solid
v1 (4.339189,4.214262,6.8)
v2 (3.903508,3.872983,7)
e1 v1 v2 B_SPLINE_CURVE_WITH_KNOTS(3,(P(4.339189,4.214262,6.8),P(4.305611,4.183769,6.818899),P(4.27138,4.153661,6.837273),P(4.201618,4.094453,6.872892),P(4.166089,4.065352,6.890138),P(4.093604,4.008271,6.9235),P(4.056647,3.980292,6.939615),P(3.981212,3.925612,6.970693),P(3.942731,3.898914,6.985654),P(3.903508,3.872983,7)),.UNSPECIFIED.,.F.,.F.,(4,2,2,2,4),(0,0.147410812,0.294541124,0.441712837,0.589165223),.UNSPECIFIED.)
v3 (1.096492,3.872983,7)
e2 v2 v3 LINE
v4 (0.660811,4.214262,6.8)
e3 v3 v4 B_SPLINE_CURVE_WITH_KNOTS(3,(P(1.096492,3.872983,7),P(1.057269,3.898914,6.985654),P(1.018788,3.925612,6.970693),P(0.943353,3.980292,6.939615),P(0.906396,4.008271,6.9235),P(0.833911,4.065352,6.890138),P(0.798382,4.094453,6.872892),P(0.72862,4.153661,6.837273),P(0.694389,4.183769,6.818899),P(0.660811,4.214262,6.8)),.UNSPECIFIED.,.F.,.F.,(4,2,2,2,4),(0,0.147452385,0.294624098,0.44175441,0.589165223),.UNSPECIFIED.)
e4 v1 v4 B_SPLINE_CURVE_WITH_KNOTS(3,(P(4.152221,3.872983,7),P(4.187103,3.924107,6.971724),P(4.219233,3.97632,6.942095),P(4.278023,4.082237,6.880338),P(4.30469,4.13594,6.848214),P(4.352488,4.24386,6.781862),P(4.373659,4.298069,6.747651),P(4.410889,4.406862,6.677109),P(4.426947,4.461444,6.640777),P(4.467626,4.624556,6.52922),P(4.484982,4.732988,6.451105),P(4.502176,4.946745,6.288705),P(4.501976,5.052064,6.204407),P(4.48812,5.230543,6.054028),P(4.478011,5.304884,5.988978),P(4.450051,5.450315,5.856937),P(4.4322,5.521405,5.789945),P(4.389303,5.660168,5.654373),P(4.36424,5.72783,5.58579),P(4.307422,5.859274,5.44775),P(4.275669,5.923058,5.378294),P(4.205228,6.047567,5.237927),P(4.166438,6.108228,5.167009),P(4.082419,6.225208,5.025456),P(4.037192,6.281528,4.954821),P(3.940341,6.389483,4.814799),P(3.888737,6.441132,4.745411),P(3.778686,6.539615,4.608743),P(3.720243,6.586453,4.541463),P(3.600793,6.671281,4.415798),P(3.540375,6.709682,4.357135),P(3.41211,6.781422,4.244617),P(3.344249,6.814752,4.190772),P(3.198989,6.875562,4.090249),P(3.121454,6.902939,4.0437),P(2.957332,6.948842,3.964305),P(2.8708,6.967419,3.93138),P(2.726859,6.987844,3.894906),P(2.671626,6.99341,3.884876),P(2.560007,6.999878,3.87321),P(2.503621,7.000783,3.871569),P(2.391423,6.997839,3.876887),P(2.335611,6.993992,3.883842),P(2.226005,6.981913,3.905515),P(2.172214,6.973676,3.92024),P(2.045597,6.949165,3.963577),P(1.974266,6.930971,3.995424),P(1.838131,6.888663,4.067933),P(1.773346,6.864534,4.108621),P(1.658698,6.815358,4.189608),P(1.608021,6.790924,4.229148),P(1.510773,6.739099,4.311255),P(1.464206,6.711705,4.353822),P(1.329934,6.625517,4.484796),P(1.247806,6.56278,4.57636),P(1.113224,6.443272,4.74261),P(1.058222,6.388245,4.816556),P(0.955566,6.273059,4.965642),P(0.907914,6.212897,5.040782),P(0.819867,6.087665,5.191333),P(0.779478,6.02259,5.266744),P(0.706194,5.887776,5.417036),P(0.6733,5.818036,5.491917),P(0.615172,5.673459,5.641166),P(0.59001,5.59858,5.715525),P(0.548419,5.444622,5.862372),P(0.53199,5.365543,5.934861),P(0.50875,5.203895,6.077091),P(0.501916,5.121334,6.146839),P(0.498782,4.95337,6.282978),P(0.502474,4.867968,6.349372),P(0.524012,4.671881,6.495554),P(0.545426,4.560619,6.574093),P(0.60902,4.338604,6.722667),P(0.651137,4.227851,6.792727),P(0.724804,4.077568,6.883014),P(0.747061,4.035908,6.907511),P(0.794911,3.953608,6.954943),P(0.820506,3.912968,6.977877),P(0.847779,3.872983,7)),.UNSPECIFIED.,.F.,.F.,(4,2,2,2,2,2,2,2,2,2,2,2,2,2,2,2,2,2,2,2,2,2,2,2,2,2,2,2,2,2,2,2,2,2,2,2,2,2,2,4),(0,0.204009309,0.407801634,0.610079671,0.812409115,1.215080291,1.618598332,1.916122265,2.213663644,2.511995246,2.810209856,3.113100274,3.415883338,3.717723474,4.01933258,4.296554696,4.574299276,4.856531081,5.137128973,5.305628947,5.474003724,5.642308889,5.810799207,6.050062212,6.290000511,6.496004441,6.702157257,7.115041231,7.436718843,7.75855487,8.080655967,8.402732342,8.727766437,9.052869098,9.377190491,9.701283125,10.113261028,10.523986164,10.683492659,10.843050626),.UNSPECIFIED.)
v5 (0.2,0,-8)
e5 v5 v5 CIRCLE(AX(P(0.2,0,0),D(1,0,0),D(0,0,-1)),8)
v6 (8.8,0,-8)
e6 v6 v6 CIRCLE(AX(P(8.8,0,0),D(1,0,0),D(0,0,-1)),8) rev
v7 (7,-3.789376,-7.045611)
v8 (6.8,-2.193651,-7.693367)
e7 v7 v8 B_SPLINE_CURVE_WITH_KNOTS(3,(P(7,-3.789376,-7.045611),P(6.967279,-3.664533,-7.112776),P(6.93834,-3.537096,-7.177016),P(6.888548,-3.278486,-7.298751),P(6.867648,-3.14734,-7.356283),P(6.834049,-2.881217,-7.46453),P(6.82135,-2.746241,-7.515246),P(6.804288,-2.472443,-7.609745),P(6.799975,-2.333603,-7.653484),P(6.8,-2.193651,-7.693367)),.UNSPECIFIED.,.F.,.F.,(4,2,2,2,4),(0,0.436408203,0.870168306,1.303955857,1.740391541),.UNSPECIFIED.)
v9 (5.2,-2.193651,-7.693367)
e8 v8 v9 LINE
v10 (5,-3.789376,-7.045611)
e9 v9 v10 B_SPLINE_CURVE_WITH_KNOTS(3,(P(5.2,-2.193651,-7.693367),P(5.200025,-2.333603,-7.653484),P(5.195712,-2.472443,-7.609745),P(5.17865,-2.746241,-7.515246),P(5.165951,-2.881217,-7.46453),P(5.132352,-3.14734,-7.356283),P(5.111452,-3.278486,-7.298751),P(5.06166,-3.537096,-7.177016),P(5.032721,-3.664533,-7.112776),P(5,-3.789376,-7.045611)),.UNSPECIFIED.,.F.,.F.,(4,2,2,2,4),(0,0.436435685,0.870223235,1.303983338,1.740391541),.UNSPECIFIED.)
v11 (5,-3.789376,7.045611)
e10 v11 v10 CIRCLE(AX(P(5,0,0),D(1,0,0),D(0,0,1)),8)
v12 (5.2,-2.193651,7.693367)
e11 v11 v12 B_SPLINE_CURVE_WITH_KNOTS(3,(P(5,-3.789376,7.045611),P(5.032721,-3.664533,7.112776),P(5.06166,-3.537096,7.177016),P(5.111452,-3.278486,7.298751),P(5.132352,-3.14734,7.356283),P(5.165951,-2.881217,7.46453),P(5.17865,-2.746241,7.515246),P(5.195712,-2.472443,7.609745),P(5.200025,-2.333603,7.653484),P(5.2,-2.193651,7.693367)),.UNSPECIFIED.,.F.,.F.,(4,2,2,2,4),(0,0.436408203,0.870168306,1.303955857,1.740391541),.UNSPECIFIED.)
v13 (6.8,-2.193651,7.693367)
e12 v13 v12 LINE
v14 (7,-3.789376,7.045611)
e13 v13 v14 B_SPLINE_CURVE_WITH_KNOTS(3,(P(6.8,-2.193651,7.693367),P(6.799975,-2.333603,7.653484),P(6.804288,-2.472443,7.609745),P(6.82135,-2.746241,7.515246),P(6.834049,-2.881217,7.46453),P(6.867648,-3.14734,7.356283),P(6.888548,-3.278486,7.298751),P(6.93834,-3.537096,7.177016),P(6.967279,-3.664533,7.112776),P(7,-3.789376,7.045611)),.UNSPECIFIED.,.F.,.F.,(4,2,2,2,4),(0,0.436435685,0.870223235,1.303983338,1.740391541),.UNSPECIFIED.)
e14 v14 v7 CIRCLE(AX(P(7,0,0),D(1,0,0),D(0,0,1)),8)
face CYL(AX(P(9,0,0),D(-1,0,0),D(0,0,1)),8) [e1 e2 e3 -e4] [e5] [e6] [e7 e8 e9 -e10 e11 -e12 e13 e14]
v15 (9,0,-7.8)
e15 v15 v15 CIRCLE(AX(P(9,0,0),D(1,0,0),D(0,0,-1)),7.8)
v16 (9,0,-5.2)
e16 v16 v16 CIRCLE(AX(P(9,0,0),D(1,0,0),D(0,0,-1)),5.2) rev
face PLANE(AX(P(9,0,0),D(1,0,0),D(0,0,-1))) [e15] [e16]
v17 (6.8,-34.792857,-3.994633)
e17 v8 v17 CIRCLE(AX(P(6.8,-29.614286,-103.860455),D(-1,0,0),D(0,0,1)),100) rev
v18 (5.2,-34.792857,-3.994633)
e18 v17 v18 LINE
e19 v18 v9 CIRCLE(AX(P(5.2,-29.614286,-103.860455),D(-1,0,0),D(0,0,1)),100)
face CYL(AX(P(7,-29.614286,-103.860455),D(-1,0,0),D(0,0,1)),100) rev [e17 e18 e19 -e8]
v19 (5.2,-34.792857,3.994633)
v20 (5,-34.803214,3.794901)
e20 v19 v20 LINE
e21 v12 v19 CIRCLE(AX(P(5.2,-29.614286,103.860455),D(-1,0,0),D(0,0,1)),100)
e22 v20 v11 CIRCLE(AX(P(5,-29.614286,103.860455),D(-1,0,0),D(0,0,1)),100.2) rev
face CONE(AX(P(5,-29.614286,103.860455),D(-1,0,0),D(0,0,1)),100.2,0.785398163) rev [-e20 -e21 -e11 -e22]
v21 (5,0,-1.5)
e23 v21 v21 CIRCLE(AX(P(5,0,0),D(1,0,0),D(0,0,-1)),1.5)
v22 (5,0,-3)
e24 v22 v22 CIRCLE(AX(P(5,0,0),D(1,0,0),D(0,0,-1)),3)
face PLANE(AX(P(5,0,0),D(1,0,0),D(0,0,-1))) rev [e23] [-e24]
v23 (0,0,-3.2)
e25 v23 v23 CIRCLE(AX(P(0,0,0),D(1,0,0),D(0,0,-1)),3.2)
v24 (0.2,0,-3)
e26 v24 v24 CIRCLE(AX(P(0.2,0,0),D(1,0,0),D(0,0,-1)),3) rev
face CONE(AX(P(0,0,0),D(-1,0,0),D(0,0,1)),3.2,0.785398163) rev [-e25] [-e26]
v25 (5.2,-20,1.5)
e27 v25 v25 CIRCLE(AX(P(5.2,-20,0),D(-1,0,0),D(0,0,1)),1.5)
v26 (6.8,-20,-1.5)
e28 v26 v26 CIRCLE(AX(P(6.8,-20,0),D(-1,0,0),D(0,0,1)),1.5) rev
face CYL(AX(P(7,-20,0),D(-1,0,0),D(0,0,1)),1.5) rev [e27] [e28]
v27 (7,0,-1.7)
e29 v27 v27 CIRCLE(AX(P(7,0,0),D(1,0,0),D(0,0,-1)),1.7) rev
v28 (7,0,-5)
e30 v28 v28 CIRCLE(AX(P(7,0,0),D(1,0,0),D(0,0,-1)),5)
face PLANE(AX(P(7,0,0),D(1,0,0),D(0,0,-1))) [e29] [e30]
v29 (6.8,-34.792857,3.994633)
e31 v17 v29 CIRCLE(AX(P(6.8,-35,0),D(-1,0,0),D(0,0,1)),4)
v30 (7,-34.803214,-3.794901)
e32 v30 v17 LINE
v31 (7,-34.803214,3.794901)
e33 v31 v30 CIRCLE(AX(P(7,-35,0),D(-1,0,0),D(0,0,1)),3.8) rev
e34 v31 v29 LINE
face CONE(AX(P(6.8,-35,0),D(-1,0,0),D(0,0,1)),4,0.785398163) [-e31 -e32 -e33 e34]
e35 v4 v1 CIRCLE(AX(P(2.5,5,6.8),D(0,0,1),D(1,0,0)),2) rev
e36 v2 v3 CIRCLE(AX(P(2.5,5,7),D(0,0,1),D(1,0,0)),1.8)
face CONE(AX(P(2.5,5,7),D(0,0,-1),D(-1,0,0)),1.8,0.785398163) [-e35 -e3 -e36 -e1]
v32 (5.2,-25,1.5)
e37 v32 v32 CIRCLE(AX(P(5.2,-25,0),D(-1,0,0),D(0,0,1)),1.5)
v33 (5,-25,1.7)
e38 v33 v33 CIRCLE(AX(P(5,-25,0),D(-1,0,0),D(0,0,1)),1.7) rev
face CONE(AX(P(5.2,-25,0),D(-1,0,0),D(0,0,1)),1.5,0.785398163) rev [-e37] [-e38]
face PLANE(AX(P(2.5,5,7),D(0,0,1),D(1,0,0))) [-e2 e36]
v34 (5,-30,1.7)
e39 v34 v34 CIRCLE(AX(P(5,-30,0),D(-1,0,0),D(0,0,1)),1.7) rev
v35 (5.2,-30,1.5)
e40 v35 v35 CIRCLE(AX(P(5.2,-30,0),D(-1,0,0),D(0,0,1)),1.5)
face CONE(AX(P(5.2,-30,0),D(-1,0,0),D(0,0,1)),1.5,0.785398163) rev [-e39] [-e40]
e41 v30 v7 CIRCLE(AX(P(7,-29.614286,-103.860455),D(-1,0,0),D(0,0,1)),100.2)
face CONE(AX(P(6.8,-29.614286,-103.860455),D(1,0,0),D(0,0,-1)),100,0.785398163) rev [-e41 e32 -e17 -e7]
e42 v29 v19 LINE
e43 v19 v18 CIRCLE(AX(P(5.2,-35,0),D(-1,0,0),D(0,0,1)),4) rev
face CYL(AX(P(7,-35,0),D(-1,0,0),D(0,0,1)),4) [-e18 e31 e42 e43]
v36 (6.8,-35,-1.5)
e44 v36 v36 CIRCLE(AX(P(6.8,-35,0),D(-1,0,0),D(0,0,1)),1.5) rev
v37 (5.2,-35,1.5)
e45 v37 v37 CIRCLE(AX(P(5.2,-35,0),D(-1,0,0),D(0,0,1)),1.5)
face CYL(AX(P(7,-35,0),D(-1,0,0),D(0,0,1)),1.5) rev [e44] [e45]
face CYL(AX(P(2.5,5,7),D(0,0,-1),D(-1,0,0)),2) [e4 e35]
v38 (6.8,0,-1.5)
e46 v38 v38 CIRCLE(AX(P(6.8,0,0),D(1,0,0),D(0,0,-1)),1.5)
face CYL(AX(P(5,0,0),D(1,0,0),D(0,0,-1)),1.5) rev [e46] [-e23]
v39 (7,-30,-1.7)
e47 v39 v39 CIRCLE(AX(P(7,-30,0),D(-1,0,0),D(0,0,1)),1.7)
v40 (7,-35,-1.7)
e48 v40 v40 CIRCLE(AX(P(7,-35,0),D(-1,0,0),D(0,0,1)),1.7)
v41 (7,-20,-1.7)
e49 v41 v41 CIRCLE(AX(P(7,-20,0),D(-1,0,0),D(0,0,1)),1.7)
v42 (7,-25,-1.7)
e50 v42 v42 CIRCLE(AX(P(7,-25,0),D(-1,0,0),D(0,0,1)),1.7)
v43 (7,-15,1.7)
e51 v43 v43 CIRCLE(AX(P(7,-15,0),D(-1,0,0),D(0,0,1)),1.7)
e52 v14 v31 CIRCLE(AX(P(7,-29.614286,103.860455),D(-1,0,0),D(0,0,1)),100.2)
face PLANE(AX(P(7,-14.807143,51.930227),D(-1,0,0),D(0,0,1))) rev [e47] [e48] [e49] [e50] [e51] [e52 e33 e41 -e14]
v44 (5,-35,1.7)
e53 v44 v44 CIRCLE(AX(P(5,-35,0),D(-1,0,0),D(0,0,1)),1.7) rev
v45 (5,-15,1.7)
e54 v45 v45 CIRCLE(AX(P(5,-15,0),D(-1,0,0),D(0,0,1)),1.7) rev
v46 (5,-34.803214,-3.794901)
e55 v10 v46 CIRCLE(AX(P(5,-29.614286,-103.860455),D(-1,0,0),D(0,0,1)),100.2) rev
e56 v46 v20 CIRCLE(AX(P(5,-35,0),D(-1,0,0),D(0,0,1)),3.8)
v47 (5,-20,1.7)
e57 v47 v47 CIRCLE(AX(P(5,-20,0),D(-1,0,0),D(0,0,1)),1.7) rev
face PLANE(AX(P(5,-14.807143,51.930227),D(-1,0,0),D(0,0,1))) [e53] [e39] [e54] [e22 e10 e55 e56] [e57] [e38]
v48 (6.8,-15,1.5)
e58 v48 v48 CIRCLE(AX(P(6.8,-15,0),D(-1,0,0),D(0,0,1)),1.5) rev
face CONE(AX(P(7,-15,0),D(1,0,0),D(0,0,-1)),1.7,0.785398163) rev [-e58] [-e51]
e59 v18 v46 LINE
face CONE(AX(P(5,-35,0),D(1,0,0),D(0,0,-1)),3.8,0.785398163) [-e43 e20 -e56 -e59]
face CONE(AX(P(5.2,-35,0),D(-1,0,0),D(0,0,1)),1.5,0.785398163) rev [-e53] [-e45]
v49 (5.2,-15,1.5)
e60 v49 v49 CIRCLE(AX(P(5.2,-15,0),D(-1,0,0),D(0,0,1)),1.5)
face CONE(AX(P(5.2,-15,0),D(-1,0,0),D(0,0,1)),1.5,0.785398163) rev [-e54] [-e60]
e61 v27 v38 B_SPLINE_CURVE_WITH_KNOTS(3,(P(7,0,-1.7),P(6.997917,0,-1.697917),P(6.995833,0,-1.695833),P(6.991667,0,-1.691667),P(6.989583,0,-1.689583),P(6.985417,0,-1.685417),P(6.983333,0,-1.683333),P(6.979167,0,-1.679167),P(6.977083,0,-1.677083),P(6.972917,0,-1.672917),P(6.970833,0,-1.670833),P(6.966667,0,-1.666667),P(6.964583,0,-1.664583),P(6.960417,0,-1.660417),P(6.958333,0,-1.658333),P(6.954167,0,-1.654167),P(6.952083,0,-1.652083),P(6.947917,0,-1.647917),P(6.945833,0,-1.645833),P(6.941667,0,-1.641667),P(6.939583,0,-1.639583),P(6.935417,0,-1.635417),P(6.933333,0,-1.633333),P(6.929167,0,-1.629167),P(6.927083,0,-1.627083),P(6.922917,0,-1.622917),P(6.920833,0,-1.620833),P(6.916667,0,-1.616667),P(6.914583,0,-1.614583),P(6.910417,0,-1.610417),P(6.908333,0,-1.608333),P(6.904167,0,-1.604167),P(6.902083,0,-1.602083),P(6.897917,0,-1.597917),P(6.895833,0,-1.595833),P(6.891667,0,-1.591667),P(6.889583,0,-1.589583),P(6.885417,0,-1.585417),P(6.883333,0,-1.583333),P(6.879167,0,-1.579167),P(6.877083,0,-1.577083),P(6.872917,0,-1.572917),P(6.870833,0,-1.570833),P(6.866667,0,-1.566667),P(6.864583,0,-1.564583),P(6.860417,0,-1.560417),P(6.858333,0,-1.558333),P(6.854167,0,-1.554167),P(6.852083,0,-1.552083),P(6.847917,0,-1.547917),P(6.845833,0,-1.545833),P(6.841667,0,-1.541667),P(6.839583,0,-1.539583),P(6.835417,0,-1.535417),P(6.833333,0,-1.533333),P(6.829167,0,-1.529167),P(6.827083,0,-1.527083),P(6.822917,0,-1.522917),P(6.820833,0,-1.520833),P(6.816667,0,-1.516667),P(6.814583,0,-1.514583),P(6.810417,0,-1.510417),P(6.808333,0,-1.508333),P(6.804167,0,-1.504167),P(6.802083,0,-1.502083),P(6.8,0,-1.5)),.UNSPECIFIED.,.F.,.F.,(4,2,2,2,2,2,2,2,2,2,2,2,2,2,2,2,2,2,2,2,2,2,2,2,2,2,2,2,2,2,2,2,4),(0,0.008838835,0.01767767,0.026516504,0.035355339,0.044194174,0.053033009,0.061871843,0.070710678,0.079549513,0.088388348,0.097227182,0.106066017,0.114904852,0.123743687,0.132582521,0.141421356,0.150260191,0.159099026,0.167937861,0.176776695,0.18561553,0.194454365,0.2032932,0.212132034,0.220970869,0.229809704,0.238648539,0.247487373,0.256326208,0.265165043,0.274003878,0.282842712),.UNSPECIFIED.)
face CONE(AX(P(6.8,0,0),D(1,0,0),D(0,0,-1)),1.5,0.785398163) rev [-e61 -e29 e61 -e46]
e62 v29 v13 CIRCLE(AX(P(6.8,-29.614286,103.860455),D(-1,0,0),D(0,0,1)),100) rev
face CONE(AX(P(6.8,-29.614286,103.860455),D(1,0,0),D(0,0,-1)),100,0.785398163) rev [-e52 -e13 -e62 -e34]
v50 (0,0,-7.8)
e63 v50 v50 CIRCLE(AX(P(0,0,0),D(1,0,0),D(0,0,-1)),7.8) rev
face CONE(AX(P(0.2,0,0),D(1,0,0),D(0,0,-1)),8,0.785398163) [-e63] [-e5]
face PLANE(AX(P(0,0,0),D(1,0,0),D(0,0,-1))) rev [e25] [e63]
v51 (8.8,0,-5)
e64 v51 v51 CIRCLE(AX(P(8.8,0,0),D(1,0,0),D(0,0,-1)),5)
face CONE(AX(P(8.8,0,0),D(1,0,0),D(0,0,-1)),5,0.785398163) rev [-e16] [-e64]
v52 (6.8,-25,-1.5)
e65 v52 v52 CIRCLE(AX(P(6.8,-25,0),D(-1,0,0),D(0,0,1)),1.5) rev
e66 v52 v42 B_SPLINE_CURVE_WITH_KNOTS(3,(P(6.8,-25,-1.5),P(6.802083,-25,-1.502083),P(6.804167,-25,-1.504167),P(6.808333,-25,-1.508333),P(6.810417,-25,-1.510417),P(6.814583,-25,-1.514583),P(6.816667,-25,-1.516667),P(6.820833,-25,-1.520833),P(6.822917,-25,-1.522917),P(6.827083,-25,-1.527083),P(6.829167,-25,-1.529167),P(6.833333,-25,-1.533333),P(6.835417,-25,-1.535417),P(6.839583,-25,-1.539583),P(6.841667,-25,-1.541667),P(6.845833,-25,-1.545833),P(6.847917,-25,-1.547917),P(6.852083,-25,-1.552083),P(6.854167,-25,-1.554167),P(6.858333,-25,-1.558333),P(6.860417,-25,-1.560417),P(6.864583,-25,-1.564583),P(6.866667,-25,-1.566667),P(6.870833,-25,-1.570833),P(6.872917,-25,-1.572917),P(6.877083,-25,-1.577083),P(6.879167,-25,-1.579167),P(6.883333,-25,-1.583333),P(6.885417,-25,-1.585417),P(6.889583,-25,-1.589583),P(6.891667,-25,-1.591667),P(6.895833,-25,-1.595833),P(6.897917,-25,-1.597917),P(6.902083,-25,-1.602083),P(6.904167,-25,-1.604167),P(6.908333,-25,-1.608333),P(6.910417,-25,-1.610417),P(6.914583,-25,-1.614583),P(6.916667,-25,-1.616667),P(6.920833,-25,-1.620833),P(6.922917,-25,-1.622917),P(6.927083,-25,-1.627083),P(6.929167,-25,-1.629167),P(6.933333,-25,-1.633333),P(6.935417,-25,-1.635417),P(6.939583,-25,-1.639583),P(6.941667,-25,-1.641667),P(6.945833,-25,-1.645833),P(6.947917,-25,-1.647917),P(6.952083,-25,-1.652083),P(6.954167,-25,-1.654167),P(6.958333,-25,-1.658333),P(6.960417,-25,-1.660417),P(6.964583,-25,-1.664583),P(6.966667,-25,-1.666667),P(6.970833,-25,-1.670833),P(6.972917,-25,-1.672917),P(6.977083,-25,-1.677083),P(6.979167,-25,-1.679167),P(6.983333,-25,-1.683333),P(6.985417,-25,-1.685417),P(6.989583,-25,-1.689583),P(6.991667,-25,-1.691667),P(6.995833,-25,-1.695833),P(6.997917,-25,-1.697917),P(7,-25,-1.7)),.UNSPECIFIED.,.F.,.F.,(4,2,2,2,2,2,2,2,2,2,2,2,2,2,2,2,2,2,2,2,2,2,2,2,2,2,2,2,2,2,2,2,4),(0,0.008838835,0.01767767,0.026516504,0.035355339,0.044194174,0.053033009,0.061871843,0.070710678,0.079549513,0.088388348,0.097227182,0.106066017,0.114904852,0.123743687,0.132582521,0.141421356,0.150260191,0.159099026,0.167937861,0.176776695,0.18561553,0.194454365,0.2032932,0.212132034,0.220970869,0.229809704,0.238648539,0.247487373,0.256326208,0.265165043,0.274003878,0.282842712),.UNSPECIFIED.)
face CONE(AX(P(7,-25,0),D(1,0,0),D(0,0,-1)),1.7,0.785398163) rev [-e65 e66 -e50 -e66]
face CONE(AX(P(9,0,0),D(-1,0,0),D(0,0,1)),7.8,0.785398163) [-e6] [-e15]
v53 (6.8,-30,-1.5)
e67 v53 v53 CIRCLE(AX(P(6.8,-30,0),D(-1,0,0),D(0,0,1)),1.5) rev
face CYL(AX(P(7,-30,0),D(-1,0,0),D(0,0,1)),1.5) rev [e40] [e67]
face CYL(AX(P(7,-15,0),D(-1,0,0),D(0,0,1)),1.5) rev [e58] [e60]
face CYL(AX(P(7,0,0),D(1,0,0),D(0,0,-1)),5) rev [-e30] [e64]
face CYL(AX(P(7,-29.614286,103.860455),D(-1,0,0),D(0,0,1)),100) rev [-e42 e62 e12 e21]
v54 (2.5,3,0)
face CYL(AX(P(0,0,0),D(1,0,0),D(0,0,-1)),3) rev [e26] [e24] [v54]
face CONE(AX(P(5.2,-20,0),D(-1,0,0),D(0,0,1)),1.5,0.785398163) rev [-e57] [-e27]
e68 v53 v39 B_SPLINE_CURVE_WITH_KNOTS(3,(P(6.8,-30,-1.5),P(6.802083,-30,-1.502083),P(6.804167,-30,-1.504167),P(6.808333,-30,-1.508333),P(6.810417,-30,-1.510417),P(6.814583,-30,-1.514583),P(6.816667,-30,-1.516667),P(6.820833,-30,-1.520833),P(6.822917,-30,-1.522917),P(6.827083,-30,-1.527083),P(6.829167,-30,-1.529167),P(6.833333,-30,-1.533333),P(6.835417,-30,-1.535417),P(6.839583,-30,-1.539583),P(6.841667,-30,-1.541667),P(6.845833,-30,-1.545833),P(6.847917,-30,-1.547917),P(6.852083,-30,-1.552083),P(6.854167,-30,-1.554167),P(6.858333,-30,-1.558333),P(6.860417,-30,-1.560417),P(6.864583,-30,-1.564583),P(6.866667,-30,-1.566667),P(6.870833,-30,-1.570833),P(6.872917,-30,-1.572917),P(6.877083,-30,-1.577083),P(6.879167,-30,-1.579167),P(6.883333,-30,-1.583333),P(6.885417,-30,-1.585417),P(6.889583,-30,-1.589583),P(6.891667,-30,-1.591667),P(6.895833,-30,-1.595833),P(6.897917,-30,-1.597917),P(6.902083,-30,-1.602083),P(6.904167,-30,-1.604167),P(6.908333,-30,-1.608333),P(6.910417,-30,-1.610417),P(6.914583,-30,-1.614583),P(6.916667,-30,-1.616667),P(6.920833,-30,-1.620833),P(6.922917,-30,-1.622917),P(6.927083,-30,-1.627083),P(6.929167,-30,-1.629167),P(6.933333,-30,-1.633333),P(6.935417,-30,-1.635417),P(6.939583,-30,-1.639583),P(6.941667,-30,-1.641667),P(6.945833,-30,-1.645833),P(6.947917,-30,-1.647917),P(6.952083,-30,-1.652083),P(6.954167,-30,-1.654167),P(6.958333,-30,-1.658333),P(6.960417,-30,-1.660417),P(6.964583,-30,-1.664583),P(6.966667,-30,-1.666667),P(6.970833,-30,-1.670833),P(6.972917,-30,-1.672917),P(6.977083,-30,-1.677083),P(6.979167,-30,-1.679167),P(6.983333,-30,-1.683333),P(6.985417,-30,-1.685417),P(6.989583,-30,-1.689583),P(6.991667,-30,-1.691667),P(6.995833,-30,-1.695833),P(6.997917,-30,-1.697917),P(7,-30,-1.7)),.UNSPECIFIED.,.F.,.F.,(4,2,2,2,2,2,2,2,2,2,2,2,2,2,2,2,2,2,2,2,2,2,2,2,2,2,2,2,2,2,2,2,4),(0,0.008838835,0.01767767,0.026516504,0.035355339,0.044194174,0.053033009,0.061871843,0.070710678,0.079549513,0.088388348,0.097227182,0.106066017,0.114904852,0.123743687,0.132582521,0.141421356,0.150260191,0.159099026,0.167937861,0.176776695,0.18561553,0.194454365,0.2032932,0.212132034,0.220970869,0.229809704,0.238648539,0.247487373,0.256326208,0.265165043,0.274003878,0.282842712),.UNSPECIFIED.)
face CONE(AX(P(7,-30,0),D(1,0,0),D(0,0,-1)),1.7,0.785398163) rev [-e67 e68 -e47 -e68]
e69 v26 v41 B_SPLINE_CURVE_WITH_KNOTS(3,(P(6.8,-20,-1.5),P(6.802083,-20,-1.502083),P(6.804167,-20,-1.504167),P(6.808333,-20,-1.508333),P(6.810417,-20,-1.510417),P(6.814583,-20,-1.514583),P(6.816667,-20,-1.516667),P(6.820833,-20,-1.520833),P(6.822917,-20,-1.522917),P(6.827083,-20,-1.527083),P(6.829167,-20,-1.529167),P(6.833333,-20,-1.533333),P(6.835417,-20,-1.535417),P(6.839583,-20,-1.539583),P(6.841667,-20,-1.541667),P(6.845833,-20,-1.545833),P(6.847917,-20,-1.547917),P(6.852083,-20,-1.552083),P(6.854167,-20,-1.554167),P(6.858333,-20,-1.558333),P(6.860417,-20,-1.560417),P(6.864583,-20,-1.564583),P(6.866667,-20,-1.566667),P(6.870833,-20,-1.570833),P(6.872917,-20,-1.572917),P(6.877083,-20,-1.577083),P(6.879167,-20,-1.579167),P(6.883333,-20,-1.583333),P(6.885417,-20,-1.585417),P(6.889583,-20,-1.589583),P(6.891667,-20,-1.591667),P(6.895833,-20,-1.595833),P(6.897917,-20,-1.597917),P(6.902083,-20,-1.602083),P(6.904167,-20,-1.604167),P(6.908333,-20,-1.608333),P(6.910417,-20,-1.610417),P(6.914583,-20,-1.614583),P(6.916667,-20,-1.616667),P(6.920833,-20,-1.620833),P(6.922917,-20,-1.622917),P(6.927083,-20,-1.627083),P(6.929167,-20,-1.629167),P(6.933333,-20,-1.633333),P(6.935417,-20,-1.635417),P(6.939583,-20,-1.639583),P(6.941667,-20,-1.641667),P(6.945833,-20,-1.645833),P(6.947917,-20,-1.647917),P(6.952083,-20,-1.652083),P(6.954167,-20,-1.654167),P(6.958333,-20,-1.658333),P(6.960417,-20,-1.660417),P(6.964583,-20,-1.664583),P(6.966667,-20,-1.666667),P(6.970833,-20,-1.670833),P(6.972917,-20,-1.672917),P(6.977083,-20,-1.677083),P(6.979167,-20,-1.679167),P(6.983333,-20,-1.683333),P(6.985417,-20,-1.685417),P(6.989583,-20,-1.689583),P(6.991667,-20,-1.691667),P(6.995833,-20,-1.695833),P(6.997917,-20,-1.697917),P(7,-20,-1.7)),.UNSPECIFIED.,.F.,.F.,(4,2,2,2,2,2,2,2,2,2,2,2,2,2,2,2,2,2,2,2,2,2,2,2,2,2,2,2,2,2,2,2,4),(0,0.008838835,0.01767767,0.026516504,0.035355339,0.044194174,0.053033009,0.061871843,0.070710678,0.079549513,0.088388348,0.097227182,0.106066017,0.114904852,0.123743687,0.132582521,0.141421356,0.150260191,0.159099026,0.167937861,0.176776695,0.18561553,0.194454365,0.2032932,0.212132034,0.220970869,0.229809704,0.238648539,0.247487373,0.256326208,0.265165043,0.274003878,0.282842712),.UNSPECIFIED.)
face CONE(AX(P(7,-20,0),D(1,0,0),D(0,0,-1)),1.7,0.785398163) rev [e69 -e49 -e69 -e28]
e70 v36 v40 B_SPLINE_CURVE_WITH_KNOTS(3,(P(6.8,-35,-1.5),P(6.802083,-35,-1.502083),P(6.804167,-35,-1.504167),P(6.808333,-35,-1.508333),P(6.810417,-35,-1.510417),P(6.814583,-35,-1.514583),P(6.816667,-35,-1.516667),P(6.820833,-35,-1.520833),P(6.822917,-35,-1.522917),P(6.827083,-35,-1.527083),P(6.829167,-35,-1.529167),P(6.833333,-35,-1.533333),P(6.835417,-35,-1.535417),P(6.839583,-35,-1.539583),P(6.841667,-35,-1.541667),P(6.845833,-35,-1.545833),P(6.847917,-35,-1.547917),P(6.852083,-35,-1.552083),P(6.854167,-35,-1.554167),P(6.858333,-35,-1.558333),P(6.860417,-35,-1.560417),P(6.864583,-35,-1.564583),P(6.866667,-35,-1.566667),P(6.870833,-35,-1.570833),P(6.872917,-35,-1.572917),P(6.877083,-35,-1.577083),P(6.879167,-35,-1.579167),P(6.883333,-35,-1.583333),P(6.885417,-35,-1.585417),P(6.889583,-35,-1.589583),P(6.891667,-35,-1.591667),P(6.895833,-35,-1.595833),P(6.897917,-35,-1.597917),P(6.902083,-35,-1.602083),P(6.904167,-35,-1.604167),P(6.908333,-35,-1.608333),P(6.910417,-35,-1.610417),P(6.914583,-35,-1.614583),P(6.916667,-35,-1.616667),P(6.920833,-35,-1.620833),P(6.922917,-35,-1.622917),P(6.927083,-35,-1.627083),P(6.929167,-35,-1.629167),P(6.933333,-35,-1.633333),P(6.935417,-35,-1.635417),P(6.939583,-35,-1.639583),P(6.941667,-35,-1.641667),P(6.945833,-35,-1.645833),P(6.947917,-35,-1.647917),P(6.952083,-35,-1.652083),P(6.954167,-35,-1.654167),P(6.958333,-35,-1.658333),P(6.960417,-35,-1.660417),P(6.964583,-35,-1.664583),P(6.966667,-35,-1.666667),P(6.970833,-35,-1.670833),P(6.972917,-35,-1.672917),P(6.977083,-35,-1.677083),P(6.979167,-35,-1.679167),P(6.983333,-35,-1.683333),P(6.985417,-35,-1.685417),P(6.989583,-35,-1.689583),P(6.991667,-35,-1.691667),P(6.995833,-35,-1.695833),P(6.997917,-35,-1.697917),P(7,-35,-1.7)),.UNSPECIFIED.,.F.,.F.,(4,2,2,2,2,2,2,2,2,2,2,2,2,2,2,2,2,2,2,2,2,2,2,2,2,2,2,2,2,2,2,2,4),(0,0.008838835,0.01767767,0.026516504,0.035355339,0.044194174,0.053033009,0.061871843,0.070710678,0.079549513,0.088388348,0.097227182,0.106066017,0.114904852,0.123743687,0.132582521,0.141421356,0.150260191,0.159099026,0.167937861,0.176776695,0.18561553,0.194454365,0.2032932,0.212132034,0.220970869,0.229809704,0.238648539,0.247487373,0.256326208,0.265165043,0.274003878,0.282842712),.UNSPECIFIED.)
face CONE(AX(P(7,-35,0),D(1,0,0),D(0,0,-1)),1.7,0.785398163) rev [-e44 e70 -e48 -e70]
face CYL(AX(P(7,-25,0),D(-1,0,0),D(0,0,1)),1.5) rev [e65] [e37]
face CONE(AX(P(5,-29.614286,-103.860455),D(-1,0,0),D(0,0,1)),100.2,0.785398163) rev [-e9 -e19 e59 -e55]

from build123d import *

# Parameters (mm, degrees)
SKETCH_1_R          = 8
EXTRUDE_1_DEPTH     = 9
SKETCH_2_R          = 5
CUT_EXTRUDE_1_DEPTH = 2
SKETCH_3_R          = 1.5
CUT_EXTRUDE_2_DEPTH = 2
SKETCH_4_R          = 3
CUT_EXTRUDE_3_DEPTH = 5
SKETCH_6_R          = 2
EXTRUDE_2_DEPTH     = 7
SKETCH_7_R          = 1.5
EXTRUDE_3_DEPTH     = 2
CHAMFER_1_SIZE      = 0.2
CHAMFER_2_SIZE      = 0.2


with BuildPart() as part:
    # 草图1 → 凸台-拉伸1 (new body)
    with BuildSketch(Plane(origin=(0, 0, 0), x_dir=(0, 0, -1), z_dir=(1, 0, 0))):
        Circle(SKETCH_1_R)
    extrude(amount=EXTRUDE_1_DEPTH)

    # 草图2 → 切除-拉伸1 (cut)
    with BuildSketch(Plane(origin=(9, 0, 0), x_dir=(0, 0, -1), z_dir=(1, 0, 0))):
        Circle(SKETCH_2_R)
    extrude(amount=-CUT_EXTRUDE_1_DEPTH, mode=Mode.SUBTRACT)

    # 草图3 → 切除-拉伸2 (cut)
    with BuildSketch(Plane(origin=(7, 0, 0), x_dir=(0, 0, -1), z_dir=(1, 0, 0))):
        Circle(SKETCH_3_R)
    extrude(amount=-CUT_EXTRUDE_2_DEPTH, mode=Mode.SUBTRACT)

    # 草图4 → 切除-拉伸3 (cut)
    with BuildSketch(Plane(origin=(5, 0, 0), x_dir=(0, 0, -1), z_dir=(1, 0, 0))):
        Circle(SKETCH_4_R)
    extrude(amount=-CUT_EXTRUDE_3_DEPTH, mode=Mode.SUBTRACT)

    # 草图6 → 凸台-拉伸2 (add)
    with BuildSketch(Plane.XY):
        with Locations((2.5, 5)):
            Circle(SKETCH_6_R)
    extrude(amount=EXTRUDE_2_DEPTH)

    # 草图7 → 凸台-拉伸3 (add)
    with BuildSketch(Plane.ZY.offset(-5)):
        with BuildLine():
            ThreePointArc((-3.994632879, -34.792857143), (0, -39), (3.994632879, -34.792857143))
            ThreePointArc((3.994632879, -34.792857143), (4.497974535, -18.34053276), (7.693367026, -2.193650794))
            ThreePointArc((7.693367026, -2.193650794), (0, -8), (-7.693367026, -2.193650794))
            ThreePointArc((-7.693367026, -2.193650794), (-4.497974535, -18.34053276), (-3.994632879, -34.792857143))
        make_face()
        with Locations((0, -35)):
            Circle(SKETCH_7_R, mode=Mode.SUBTRACT)
        with Locations((0, -30)):
            Circle(SKETCH_7_R, mode=Mode.SUBTRACT)
        with Locations((0, -25)):
            Circle(SKETCH_7_R, mode=Mode.SUBTRACT)
        with Locations((0, -20)):
            Circle(SKETCH_7_R, mode=Mode.SUBTRACT)
        with Locations((0, -15)):
            Circle(SKETCH_7_R, mode=Mode.SUBTRACT)
    extrude(amount=-EXTRUDE_3_DEPTH)

    # 倒角1
    # the kernel refuses this chamfer: 0.2 mm, written as the material it takes off along each edge
    with BuildSketch(Plane(origin=(2.5, 5, 7), x_dir=(0.6550221051171238, -0.7556097152683597, 0), z_dir=(-0.7556097152683597, -0.6550221051171238, 0))) as chamfer_1_piece_1_section:
        Polygon((2 - CHAMFER_1_SIZE, 0), (2, -CHAMFER_1_SIZE), (2, 0), align=None)
    chamfer_1_piece_1 = revolve(axis=Axis((2.5, 5, 7), (0, 0, 1)), revolution_arc=278.157347794, mode=Mode.PRIVATE)
    chamfer_1_piece_1 = chamfer_1_piece_1 - Plane(origin=(2.5, 0, 0), x_dir=(0, 0, -1), z_dir=(-1, 0, 0)) * Cylinder(8, 9, mode=Mode.PRIVATE)
    add(chamfer_1_piece_1, mode=Mode.SUBTRACT)
    with BuildSketch(Plane(origin=(0, 0, 0), x_dir=(0, 0, -1), z_dir=(0, -1, 0))) as chamfer_1_piece_2:
        Polygon((3 + CHAMFER_1_SIZE, 0), (3, CHAMFER_1_SIZE), (3, 0), align=None)
    revolve(axis=Axis((0, 0, 0), (1, 0, 0)), mode=Mode.SUBTRACT)
    with BuildSketch(Plane(origin=(0, 0, 0), x_dir=(0, 0, -1), z_dir=(0, -1, 0))) as chamfer_1_piece_3:
        Polygon((8, CHAMFER_1_SIZE), (8 - CHAMFER_1_SIZE, 0), (8, 0), align=None)
    revolve(axis=Axis((0, 0, 0), (1, 0, 0)), mode=Mode.SUBTRACT)
    with BuildSketch(Plane(origin=(7, 0, 0), x_dir=(0, 0, -1), z_dir=(0, -1, 0))) as chamfer_1_piece_4:
        Polygon((1.5 + CHAMFER_1_SIZE, 0), (1.5, -CHAMFER_1_SIZE), (1.5, 0), align=None)
    revolve(axis=Axis((7, 0, 0), (1, 0, 0)), mode=Mode.SUBTRACT)
    with BuildSketch(Plane(origin=(9, 0, 0), x_dir=(0, 0, -1), z_dir=(0, -1, 0))) as chamfer_1_piece_5:
        Polygon((5 + CHAMFER_1_SIZE, 0), (5, -CHAMFER_1_SIZE), (5, 0), align=None)
    revolve(axis=Axis((9, 0, 0), (1, 0, 0)), mode=Mode.SUBTRACT)
    with BuildSketch(Plane(origin=(9, 0, 0), x_dir=(0, 0, -1), z_dir=(0, -1, 0))) as chamfer_1_piece_6:
        Polygon((8, -CHAMFER_1_SIZE), (8 - CHAMFER_1_SIZE, 0), (8, 0), align=None)
    revolve(axis=Axis((9, 0, 0), (1, 0, 0)), mode=Mode.SUBTRACT)

    # 倒角2
    # the kernel refuses this chamfer: 0.2 mm, written as the material it takes off along each edge
    with BuildSketch(Plane(origin=(7, -29.614285714, 103.86045485), x_dir=(0, -0.05178571428571552, -0.9986582197107868), z_dir=(0, -0.9986582197107868, 0.05178571428571552))) as chamfer_2_piece_1_section:
        Polygon((100, -CHAMFER_2_SIZE), (100 + CHAMFER_2_SIZE, 0), (100, 0), align=None)
    chamfer_2_piece_1 = revolve(axis=Axis((7, -29.614285714, 103.86045485), (1, 0, 0)), revolution_arc=20.356645861, mode=Mode.PRIVATE)
    chamfer_2_piece_1 = chamfer_2_piece_1 - Plane(origin=(7, 0, 0), x_dir=(0, 0, -1), z_dir=(-1, 0, 0)) * Cylinder(8, 401, mode=Mode.PRIVATE)
    add(chamfer_2_piece_1, mode=Mode.SUBTRACT)
    with BuildSketch(Plane(origin=(7, -35, 0), x_dir=(0, 0.05178571428571369, -0.9986582197107869), z_dir=(0, 0.9986582197107869, 0.05178571428571369))) as chamfer_2_piece_2:
        Polygon((4 - CHAMFER_2_SIZE, 0), (4, CHAMFER_2_SIZE), (4, 0), align=None)
    revolve(axis=Axis((7, -35, 0), (-1, 0, 0)), revolution_arc=185.936861294, mode=Mode.SUBTRACT)
    with BuildSketch(Plane(origin=(7, -29.614285714, -103.86045485), x_dir=(0, 0.29884451461423694, 0.9543018160335759), z_dir=(0, 0.9543018160335759, -0.29884451461423694))) as chamfer_2_piece_3_section:
        Polygon((100 + CHAMFER_2_SIZE, 0), (100, -CHAMFER_2_SIZE), (100, 0), align=None)
    chamfer_2_piece_3 = revolve(axis=Axis((7, -29.614285714, -103.86045485), (1, 0, 0)), revolution_arc=20.356645861, mode=Mode.PRIVATE)
    chamfer_2_piece_3 = chamfer_2_piece_3 - Plane(origin=(7, 0, 0), x_dir=(0, 0, -1), z_dir=(-1, 0, 0)) * Cylinder(8, 401, mode=Mode.PRIVATE)
    add(chamfer_2_piece_3, mode=Mode.SUBTRACT)
    with BuildSketch(Plane(origin=(7, -15, 0), x_dir=(0, 0, 1), z_dir=(0, -1, 0))) as chamfer_2_piece_4:
        Polygon((1.5 + CHAMFER_2_SIZE, 0), (1.5, CHAMFER_2_SIZE), (1.5, 0), align=None)
    revolve(axis=Axis((7, -15, 0), (-1, 0, 0)), mode=Mode.SUBTRACT)
    with BuildSketch(Plane(origin=(7, -20, 0), x_dir=(0, 0, 1), z_dir=(0, -1, 0))) as chamfer_2_piece_5:
        Polygon((1.5 + CHAMFER_2_SIZE, 0), (1.5, CHAMFER_2_SIZE), (1.5, 0), align=None)
    revolve(axis=Axis((7, -20, 0), (-1, 0, 0)), mode=Mode.SUBTRACT)
    with BuildSketch(Plane(origin=(7, -25, 0), x_dir=(0, 0, 1), z_dir=(0, -1, 0))) as chamfer_2_piece_6:
        Polygon((1.5 + CHAMFER_2_SIZE, 0), (1.5, CHAMFER_2_SIZE), (1.5, 0), align=None)
    revolve(axis=Axis((7, -25, 0), (-1, 0, 0)), mode=Mode.SUBTRACT)
    with BuildSketch(Plane(origin=(7, -30, 0), x_dir=(0, 0, 1), z_dir=(0, -1, 0))) as chamfer_2_piece_7:
        Polygon((1.5 + CHAMFER_2_SIZE, 0), (1.5, CHAMFER_2_SIZE), (1.5, 0), align=None)
    revolve(axis=Axis((7, -30, 0), (-1, 0, 0)), mode=Mode.SUBTRACT)
    with BuildSketch(Plane(origin=(7, -35, 0), x_dir=(0, 0, 1), z_dir=(0, -1, 0))) as chamfer_2_piece_8:
        Polygon((1.5 + CHAMFER_2_SIZE, 0), (1.5, CHAMFER_2_SIZE), (1.5, 0), align=None)
    revolve(axis=Axis((7, -35, 0), (-1, 0, 0)), mode=Mode.SUBTRACT)
    with BuildSketch(Plane(origin=(5, -29.614285714, -103.86045485), x_dir=(0, 0.29884451461423694, 0.9543018160335759), z_dir=(0, 0.9543018160335759, -0.29884451461423694))) as chamfer_2_piece_9_section:
        Polygon((100 + CHAMFER_2_SIZE, 0), (100, CHAMFER_2_SIZE), (100, 0), align=None)
    chamfer_2_piece_9 = revolve(axis=Axis((5, -29.614285714, -103.86045485), (1, 0, 0)), revolution_arc=20.356645861, mode=Mode.PRIVATE)
    chamfer_2_piece_9 = chamfer_2_piece_9 - Plane(origin=(5, 0, 0), x_dir=(0, 0, -1), z_dir=(-1, 0, 0)) * Cylinder(8, 401, mode=Mode.PRIVATE)
    add(chamfer_2_piece_9, mode=Mode.SUBTRACT)
    with BuildSketch(Plane(origin=(5, -35, 0), x_dir=(0, 0.05178571428571369, -0.9986582197107869), z_dir=(0, 0.9986582197107869, 0.05178571428571369))) as chamfer_2_piece_10:
        Polygon((4 - CHAMFER_2_SIZE, 0), (4, -CHAMFER_2_SIZE), (4, 0), align=None)
    revolve(axis=Axis((5, -35, 0), (-1, 0, 0)), revolution_arc=185.936861294, mode=Mode.SUBTRACT)
    with BuildSketch(Plane(origin=(5, -29.614285714, 103.86045485), x_dir=(0, -0.05178571428571552, -0.9986582197107868), z_dir=(0, -0.9986582197107868, 0.05178571428571552))) as chamfer_2_piece_11_section:
        Polygon((100, CHAMFER_2_SIZE), (100 + CHAMFER_2_SIZE, 0), (100, 0), align=None)
    chamfer_2_piece_11 = revolve(axis=Axis((5, -29.614285714, 103.86045485), (1, 0, 0)), revolution_arc=20.356645861, mode=Mode.PRIVATE)
    chamfer_2_piece_11 = chamfer_2_piece_11 - Plane(origin=(5, 0, 0), x_dir=(0, 0, -1), z_dir=(-1, 0, 0)) * Cylinder(8, 401, mode=Mode.PRIVATE)
    add(chamfer_2_piece_11, mode=Mode.SUBTRACT)
    with BuildSketch(Plane(origin=(5, -35, 0), x_dir=(0, 0, 1), z_dir=(0, -1, 0))) as chamfer_2_piece_12:
        Polygon((1.5 + CHAMFER_2_SIZE, 0), (1.5, -CHAMFER_2_SIZE), (1.5, 0), align=None)
    revolve(axis=Axis((5, -35, 0), (-1, 0, 0)), mode=Mode.SUBTRACT)
    with BuildSketch(Plane(origin=(5, -30, 0), x_dir=(0, 0, 1), z_dir=(0, -1, 0))) as chamfer_2_piece_13:
        Polygon((1.5 + CHAMFER_2_SIZE, 0), (1.5, -CHAMFER_2_SIZE), (1.5, 0), align=None)
    revolve(axis=Axis((5, -30, 0), (-1, 0, 0)), mode=Mode.SUBTRACT)
    with BuildSketch(Plane(origin=(5, -25, 0), x_dir=(0, 0, 1), z_dir=(0, -1, 0))) as chamfer_2_piece_14:
        Polygon((1.5 + CHAMFER_2_SIZE, 0), (1.5, -CHAMFER_2_SIZE), (1.5, 0), align=None)
    revolve(axis=Axis((5, -25, 0), (-1, 0, 0)), mode=Mode.SUBTRACT)
    with BuildSketch(Plane(origin=(5, -20, 0), x_dir=(0, 0, 1), z_dir=(0, -1, 0))) as chamfer_2_piece_15:
        Polygon((1.5 + CHAMFER_2_SIZE, 0), (1.5, -CHAMFER_2_SIZE), (1.5, 0), align=None)
    revolve(axis=Axis((5, -20, 0), (-1, 0, 0)), mode=Mode.SUBTRACT)
    with BuildSketch(Plane(origin=(5, -15, 0), x_dir=(0, 0, 1), z_dir=(0, -1, 0))) as chamfer_2_piece_16:
        Polygon((1.5 + CHAMFER_2_SIZE, 0), (1.5, -CHAMFER_2_SIZE), (1.5, 0), align=None)
    revolve(axis=Axis((5, -15, 0), (-1, 0, 0)), mode=Mode.SUBTRACT)


solid = part.part
